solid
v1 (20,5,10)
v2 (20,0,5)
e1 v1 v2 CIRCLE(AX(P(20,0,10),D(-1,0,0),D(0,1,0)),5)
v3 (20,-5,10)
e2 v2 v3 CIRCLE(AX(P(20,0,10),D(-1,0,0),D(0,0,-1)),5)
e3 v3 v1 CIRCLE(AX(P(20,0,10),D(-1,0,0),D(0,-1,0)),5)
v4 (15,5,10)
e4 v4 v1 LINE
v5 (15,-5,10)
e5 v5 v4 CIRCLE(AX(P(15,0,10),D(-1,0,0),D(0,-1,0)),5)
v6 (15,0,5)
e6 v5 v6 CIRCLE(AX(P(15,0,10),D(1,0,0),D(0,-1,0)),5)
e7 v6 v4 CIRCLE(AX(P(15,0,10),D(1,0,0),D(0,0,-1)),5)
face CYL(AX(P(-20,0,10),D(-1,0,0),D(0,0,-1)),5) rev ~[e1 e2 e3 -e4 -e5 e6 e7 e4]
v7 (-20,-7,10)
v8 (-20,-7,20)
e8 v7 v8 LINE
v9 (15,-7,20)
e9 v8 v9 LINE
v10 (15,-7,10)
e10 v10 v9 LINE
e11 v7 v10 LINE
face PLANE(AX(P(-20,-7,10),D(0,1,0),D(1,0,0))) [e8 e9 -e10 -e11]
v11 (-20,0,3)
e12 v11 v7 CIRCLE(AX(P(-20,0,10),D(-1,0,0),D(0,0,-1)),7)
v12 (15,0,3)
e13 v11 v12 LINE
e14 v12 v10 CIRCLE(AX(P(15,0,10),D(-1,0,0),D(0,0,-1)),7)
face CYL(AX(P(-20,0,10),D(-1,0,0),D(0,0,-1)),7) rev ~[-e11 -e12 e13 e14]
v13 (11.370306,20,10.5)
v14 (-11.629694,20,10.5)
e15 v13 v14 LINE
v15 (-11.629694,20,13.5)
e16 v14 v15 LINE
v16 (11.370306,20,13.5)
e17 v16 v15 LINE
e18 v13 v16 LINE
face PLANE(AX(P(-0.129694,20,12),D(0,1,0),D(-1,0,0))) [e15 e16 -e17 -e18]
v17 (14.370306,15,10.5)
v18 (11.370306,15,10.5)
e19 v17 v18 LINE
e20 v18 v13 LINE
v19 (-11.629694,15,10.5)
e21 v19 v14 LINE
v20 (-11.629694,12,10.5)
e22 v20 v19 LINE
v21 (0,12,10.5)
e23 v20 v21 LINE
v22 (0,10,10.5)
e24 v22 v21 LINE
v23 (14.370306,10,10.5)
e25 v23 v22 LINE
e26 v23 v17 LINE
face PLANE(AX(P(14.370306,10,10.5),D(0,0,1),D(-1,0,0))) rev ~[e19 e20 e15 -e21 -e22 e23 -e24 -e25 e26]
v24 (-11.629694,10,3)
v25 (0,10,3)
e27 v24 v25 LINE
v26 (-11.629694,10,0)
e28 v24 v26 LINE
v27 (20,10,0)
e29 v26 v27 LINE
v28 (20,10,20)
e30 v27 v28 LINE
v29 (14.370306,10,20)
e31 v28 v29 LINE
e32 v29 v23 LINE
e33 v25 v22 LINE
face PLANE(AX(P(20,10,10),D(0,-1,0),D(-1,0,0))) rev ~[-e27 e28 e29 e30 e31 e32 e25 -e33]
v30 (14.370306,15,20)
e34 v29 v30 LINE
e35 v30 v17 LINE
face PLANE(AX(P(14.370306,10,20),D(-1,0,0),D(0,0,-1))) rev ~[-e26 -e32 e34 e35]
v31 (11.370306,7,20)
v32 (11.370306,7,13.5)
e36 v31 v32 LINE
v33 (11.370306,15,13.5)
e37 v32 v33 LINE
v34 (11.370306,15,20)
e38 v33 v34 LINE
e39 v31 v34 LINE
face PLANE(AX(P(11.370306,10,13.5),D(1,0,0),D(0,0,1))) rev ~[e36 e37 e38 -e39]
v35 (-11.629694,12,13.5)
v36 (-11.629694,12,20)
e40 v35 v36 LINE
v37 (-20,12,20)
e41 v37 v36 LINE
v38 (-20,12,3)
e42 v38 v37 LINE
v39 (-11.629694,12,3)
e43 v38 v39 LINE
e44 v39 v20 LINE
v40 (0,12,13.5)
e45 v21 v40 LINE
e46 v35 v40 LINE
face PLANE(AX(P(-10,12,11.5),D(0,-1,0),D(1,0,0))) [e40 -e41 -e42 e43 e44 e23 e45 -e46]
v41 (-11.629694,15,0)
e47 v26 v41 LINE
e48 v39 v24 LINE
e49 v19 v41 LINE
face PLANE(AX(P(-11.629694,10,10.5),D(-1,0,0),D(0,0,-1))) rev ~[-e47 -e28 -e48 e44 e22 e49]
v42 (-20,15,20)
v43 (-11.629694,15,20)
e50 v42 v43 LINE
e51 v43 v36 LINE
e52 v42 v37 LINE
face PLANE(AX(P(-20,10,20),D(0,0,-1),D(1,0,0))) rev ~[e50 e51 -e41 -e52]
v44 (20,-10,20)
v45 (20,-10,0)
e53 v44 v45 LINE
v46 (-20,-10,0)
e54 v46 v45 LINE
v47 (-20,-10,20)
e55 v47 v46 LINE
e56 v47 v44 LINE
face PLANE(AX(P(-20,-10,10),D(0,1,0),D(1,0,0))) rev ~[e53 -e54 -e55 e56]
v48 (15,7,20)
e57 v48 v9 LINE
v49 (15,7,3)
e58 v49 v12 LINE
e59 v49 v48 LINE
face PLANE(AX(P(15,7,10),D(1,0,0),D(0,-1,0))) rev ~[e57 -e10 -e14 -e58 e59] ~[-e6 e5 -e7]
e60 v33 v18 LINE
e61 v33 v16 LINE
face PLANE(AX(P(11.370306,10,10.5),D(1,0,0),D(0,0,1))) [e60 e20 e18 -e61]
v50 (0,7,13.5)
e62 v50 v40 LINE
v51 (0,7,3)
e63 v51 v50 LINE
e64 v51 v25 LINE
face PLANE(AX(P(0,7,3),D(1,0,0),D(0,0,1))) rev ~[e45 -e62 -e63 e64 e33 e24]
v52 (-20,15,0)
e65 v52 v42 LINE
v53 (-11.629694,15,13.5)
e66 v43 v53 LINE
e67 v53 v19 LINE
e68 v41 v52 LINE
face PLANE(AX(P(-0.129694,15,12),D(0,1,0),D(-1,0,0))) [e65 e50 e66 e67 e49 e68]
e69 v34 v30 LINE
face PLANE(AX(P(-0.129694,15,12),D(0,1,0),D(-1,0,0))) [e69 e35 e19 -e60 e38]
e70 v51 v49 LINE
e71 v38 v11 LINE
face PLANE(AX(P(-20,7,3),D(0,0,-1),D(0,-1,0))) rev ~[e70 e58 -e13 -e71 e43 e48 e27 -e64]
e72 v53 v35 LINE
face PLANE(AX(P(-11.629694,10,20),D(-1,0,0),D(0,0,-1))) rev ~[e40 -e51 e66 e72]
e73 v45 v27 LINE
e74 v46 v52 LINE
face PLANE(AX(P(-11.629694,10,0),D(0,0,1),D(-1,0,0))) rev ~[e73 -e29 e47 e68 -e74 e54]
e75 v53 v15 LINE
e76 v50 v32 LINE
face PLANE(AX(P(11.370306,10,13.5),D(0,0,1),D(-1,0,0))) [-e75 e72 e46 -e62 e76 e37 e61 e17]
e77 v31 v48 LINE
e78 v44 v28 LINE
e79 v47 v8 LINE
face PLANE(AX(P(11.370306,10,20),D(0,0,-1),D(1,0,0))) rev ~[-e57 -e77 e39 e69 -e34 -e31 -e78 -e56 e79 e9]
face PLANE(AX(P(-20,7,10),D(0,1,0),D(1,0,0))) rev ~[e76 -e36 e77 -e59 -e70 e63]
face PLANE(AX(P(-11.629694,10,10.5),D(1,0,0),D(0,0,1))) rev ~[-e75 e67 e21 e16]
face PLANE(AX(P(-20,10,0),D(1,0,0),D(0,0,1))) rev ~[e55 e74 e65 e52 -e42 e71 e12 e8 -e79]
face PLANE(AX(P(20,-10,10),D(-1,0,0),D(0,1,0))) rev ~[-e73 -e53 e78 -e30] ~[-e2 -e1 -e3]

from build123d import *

# Parameters (mm, degrees)
F0_W      = 40
F0_H      = 20
F1_DEPTH  = 10
F3_W      = 35
F3_H      = 3
F4_DEPTH  = 10
F5_W      = 23
F5_H      = 3
F6_DEPTH  = 6.5
F7_W      = 23
F7_H      = 3
F8_DEPTH  = 5
F9_DEPTH  = 10
F10_DEPTH = 35
F11_DEPTH = 40
F12_DEPTH = 35
F13_DEPTH = 40
F14_DEPTH = 35
F15_W     = 20
F15_H     = 17
F16_DEPTH = 5


with BuildPart() as f1:
    # F0 (on Top) → F1 (new body)
    with BuildSketch(Plane.XY):
        Rectangle(F0_W, F0_H)
    extrude(amount=F1_DEPTH)

    # F3 (on face) → F4 (join)
    with BuildSketch(Plane.XY.offset(10)):
        Polygon((20, -10), (20, 10), (15, 10), (15, 7), (15, -7), (15, -10), align=None)
        with Locations((-2.5, 8.5)):
            Rectangle(F3_W, F3_H)
        with Locations((-2.5, -8.5)):
            Rectangle(F3_W, F3_H)
    extrude(amount=F4_DEPTH)

    # F5 (on face) → F6 (cut)
    with BuildSketch(Plane.XY.offset(20)):
        with Locations((-0.1296941414, 8.5)):
            Rectangle(F5_W, F5_H)
    extrude(amount=-F6_DEPTH, mode=Mode.SUBTRACT)

    # F7 (on face) → F8 (join)
    with BuildSketch(Plane(origin=(0, 10, 0), x_dir=(-1, 0, 0), z_dir=(0, 1, 0))):
        with Locations((0.1296941414, 12)):
            Rectangle(F7_W, F7_H)
        Polygon((-11.3703058586, 10.5), (-11.3703058586, 13.5), (-11.3703058586, 20), (-14.3703058586, 20), (-14.3703058586, 10.5), align=None)
        Polygon((11.6296941414, 20), (11.6296941414, 13.5), (11.6296941414, 10.5), (11.6296941414, 0), (20, 0), (20, 20), align=None)
    extrude(amount=F8_DEPTH)

    # F7 (on face) → F9 (join)
    with BuildSketch(Plane(origin=(0, 10, 0), x_dir=(-1, 0, 0), z_dir=(0, 1, 0))):
        with Locations((0.1296941414, 12)):
            Rectangle(F7_W, F7_H)
    extrude(amount=F9_DEPTH)

    # F2 (on face) → F10 (cut)
    with BuildSketch(Plane(origin=(-20, 0, 0), x_dir=(0, -1, 0), z_dir=(-1, 0, 0))):
        with BuildLine():
            Line((-5, 10), (-7, 10))
            ThreePointArc((-7, 10), (-4.9497474683, 5.0502525317), (0, 3))
            Line((0, 3), (0, 5))
            ThreePointArc((0, 5), (-3.5355339059, 6.4644660941), (-5, 10))
        make_face()
        with BuildLine():
            ThreePointArc((0, 5), (3.5355339059, 6.4644660941), (5, 10))
            Line((5, 10), (0, 10))
            Line((0, 10), (0, 5))
        make_face()
    extrude(amount=-F10_DEPTH, mode=Mode.SUBTRACT)

    # F2 (on face) → F11 (cut)
    with BuildSketch(Plane(origin=(-20, 0, 0), x_dir=(0, -1, 0), z_dir=(-1, 0, 0))):
        with BuildLine():
            Line((0, 10), (5, 10))
            ThreePointArc((5, 10), (0, 15), (-5, 10))
            Line((-5, 10), (0, 10))
        make_face()
        with BuildLine():
            ThreePointArc((0, 5), (3.5355339059, 6.4644660941), (5, 10))
            Line((5, 10), (0, 10))
            Line((0, 10), (0, 5))
        make_face()
        with BuildLine():
            Line((0, 10), (-5, 10))
            ThreePointArc((-5, 10), (-3.5355339059, 6.4644660941), (0, 5))
            Line((0, 5), (0, 10))
        make_face()
    extrude(amount=-F11_DEPTH, mode=Mode.SUBTRACT)

    # F2 (on face) → F12 (cut)
    with BuildSketch(Plane(origin=(-20, 0, 0), x_dir=(0, -1, 0), z_dir=(-1, 0, 0))):
        with BuildLine():
            Line((0, 10), (-5, 10))
            ThreePointArc((-5, 10), (-3.5355339059, 6.4644660941), (0, 5))
            Line((0, 5), (0, 10))
        make_face()
        with BuildLine():
            Line((-5, 10), (-7, 10))
            ThreePointArc((-7, 10), (-4.9497474683, 5.0502525317), (0, 3))
            Line((0, 3), (0, 5))
            ThreePointArc((0, 5), (-3.5355339059, 6.4644660941), (-5, 10))
        make_face()
        with BuildLine():
            ThreePointArc((0, 3), (-4.9497474683, 5.0502525317), (-7, 10))
            Line((-7, 10), (-7, 3))
            Line((-7, 3), (0, 3))
        make_face()
    extrude(amount=-F12_DEPTH, mode=Mode.SUBTRACT)

    # F2 (on face) → F13 (cut)
    with BuildSketch(Plane(origin=(-20, 0, 0), x_dir=(0, -1, 0), z_dir=(-1, 0, 0))):
        with BuildLine():
            Line((0, 10), (-5, 10))
            ThreePointArc((-5, 10), (-3.5355339059, 6.4644660941), (0, 5))
            Line((0, 5), (0, 10))
        make_face()
    extrude(amount=-F13_DEPTH, mode=Mode.SUBTRACT)

    # F2 (on face) → F14 (cut)
    with BuildSketch(Plane(origin=(-20, 0, 0), x_dir=(0, -1, 0), z_dir=(-1, 0, 0))):
        with BuildLine():
            ThreePointArc((0, 3), (4.9497474683, 5.0502525317), (7, 10))
            Line((7, 10), (5, 10))
            ThreePointArc((5, 10), (3.5355339059, 6.4644660941), (0, 5))
            Line((0, 5), (0, 3))
        make_face()
    extrude(amount=-F14_DEPTH, mode=Mode.SUBTRACT)

    # F15 (on face) → F16 (cut)
    with BuildSketch(Plane.XZ.offset(-7)):
        with Locations((-10, 11.5)):
            Rectangle(F15_W, F15_H)
    extrude(amount=-F16_DEPTH, mode=Mode.SUBTRACT)


solid = f1.part
